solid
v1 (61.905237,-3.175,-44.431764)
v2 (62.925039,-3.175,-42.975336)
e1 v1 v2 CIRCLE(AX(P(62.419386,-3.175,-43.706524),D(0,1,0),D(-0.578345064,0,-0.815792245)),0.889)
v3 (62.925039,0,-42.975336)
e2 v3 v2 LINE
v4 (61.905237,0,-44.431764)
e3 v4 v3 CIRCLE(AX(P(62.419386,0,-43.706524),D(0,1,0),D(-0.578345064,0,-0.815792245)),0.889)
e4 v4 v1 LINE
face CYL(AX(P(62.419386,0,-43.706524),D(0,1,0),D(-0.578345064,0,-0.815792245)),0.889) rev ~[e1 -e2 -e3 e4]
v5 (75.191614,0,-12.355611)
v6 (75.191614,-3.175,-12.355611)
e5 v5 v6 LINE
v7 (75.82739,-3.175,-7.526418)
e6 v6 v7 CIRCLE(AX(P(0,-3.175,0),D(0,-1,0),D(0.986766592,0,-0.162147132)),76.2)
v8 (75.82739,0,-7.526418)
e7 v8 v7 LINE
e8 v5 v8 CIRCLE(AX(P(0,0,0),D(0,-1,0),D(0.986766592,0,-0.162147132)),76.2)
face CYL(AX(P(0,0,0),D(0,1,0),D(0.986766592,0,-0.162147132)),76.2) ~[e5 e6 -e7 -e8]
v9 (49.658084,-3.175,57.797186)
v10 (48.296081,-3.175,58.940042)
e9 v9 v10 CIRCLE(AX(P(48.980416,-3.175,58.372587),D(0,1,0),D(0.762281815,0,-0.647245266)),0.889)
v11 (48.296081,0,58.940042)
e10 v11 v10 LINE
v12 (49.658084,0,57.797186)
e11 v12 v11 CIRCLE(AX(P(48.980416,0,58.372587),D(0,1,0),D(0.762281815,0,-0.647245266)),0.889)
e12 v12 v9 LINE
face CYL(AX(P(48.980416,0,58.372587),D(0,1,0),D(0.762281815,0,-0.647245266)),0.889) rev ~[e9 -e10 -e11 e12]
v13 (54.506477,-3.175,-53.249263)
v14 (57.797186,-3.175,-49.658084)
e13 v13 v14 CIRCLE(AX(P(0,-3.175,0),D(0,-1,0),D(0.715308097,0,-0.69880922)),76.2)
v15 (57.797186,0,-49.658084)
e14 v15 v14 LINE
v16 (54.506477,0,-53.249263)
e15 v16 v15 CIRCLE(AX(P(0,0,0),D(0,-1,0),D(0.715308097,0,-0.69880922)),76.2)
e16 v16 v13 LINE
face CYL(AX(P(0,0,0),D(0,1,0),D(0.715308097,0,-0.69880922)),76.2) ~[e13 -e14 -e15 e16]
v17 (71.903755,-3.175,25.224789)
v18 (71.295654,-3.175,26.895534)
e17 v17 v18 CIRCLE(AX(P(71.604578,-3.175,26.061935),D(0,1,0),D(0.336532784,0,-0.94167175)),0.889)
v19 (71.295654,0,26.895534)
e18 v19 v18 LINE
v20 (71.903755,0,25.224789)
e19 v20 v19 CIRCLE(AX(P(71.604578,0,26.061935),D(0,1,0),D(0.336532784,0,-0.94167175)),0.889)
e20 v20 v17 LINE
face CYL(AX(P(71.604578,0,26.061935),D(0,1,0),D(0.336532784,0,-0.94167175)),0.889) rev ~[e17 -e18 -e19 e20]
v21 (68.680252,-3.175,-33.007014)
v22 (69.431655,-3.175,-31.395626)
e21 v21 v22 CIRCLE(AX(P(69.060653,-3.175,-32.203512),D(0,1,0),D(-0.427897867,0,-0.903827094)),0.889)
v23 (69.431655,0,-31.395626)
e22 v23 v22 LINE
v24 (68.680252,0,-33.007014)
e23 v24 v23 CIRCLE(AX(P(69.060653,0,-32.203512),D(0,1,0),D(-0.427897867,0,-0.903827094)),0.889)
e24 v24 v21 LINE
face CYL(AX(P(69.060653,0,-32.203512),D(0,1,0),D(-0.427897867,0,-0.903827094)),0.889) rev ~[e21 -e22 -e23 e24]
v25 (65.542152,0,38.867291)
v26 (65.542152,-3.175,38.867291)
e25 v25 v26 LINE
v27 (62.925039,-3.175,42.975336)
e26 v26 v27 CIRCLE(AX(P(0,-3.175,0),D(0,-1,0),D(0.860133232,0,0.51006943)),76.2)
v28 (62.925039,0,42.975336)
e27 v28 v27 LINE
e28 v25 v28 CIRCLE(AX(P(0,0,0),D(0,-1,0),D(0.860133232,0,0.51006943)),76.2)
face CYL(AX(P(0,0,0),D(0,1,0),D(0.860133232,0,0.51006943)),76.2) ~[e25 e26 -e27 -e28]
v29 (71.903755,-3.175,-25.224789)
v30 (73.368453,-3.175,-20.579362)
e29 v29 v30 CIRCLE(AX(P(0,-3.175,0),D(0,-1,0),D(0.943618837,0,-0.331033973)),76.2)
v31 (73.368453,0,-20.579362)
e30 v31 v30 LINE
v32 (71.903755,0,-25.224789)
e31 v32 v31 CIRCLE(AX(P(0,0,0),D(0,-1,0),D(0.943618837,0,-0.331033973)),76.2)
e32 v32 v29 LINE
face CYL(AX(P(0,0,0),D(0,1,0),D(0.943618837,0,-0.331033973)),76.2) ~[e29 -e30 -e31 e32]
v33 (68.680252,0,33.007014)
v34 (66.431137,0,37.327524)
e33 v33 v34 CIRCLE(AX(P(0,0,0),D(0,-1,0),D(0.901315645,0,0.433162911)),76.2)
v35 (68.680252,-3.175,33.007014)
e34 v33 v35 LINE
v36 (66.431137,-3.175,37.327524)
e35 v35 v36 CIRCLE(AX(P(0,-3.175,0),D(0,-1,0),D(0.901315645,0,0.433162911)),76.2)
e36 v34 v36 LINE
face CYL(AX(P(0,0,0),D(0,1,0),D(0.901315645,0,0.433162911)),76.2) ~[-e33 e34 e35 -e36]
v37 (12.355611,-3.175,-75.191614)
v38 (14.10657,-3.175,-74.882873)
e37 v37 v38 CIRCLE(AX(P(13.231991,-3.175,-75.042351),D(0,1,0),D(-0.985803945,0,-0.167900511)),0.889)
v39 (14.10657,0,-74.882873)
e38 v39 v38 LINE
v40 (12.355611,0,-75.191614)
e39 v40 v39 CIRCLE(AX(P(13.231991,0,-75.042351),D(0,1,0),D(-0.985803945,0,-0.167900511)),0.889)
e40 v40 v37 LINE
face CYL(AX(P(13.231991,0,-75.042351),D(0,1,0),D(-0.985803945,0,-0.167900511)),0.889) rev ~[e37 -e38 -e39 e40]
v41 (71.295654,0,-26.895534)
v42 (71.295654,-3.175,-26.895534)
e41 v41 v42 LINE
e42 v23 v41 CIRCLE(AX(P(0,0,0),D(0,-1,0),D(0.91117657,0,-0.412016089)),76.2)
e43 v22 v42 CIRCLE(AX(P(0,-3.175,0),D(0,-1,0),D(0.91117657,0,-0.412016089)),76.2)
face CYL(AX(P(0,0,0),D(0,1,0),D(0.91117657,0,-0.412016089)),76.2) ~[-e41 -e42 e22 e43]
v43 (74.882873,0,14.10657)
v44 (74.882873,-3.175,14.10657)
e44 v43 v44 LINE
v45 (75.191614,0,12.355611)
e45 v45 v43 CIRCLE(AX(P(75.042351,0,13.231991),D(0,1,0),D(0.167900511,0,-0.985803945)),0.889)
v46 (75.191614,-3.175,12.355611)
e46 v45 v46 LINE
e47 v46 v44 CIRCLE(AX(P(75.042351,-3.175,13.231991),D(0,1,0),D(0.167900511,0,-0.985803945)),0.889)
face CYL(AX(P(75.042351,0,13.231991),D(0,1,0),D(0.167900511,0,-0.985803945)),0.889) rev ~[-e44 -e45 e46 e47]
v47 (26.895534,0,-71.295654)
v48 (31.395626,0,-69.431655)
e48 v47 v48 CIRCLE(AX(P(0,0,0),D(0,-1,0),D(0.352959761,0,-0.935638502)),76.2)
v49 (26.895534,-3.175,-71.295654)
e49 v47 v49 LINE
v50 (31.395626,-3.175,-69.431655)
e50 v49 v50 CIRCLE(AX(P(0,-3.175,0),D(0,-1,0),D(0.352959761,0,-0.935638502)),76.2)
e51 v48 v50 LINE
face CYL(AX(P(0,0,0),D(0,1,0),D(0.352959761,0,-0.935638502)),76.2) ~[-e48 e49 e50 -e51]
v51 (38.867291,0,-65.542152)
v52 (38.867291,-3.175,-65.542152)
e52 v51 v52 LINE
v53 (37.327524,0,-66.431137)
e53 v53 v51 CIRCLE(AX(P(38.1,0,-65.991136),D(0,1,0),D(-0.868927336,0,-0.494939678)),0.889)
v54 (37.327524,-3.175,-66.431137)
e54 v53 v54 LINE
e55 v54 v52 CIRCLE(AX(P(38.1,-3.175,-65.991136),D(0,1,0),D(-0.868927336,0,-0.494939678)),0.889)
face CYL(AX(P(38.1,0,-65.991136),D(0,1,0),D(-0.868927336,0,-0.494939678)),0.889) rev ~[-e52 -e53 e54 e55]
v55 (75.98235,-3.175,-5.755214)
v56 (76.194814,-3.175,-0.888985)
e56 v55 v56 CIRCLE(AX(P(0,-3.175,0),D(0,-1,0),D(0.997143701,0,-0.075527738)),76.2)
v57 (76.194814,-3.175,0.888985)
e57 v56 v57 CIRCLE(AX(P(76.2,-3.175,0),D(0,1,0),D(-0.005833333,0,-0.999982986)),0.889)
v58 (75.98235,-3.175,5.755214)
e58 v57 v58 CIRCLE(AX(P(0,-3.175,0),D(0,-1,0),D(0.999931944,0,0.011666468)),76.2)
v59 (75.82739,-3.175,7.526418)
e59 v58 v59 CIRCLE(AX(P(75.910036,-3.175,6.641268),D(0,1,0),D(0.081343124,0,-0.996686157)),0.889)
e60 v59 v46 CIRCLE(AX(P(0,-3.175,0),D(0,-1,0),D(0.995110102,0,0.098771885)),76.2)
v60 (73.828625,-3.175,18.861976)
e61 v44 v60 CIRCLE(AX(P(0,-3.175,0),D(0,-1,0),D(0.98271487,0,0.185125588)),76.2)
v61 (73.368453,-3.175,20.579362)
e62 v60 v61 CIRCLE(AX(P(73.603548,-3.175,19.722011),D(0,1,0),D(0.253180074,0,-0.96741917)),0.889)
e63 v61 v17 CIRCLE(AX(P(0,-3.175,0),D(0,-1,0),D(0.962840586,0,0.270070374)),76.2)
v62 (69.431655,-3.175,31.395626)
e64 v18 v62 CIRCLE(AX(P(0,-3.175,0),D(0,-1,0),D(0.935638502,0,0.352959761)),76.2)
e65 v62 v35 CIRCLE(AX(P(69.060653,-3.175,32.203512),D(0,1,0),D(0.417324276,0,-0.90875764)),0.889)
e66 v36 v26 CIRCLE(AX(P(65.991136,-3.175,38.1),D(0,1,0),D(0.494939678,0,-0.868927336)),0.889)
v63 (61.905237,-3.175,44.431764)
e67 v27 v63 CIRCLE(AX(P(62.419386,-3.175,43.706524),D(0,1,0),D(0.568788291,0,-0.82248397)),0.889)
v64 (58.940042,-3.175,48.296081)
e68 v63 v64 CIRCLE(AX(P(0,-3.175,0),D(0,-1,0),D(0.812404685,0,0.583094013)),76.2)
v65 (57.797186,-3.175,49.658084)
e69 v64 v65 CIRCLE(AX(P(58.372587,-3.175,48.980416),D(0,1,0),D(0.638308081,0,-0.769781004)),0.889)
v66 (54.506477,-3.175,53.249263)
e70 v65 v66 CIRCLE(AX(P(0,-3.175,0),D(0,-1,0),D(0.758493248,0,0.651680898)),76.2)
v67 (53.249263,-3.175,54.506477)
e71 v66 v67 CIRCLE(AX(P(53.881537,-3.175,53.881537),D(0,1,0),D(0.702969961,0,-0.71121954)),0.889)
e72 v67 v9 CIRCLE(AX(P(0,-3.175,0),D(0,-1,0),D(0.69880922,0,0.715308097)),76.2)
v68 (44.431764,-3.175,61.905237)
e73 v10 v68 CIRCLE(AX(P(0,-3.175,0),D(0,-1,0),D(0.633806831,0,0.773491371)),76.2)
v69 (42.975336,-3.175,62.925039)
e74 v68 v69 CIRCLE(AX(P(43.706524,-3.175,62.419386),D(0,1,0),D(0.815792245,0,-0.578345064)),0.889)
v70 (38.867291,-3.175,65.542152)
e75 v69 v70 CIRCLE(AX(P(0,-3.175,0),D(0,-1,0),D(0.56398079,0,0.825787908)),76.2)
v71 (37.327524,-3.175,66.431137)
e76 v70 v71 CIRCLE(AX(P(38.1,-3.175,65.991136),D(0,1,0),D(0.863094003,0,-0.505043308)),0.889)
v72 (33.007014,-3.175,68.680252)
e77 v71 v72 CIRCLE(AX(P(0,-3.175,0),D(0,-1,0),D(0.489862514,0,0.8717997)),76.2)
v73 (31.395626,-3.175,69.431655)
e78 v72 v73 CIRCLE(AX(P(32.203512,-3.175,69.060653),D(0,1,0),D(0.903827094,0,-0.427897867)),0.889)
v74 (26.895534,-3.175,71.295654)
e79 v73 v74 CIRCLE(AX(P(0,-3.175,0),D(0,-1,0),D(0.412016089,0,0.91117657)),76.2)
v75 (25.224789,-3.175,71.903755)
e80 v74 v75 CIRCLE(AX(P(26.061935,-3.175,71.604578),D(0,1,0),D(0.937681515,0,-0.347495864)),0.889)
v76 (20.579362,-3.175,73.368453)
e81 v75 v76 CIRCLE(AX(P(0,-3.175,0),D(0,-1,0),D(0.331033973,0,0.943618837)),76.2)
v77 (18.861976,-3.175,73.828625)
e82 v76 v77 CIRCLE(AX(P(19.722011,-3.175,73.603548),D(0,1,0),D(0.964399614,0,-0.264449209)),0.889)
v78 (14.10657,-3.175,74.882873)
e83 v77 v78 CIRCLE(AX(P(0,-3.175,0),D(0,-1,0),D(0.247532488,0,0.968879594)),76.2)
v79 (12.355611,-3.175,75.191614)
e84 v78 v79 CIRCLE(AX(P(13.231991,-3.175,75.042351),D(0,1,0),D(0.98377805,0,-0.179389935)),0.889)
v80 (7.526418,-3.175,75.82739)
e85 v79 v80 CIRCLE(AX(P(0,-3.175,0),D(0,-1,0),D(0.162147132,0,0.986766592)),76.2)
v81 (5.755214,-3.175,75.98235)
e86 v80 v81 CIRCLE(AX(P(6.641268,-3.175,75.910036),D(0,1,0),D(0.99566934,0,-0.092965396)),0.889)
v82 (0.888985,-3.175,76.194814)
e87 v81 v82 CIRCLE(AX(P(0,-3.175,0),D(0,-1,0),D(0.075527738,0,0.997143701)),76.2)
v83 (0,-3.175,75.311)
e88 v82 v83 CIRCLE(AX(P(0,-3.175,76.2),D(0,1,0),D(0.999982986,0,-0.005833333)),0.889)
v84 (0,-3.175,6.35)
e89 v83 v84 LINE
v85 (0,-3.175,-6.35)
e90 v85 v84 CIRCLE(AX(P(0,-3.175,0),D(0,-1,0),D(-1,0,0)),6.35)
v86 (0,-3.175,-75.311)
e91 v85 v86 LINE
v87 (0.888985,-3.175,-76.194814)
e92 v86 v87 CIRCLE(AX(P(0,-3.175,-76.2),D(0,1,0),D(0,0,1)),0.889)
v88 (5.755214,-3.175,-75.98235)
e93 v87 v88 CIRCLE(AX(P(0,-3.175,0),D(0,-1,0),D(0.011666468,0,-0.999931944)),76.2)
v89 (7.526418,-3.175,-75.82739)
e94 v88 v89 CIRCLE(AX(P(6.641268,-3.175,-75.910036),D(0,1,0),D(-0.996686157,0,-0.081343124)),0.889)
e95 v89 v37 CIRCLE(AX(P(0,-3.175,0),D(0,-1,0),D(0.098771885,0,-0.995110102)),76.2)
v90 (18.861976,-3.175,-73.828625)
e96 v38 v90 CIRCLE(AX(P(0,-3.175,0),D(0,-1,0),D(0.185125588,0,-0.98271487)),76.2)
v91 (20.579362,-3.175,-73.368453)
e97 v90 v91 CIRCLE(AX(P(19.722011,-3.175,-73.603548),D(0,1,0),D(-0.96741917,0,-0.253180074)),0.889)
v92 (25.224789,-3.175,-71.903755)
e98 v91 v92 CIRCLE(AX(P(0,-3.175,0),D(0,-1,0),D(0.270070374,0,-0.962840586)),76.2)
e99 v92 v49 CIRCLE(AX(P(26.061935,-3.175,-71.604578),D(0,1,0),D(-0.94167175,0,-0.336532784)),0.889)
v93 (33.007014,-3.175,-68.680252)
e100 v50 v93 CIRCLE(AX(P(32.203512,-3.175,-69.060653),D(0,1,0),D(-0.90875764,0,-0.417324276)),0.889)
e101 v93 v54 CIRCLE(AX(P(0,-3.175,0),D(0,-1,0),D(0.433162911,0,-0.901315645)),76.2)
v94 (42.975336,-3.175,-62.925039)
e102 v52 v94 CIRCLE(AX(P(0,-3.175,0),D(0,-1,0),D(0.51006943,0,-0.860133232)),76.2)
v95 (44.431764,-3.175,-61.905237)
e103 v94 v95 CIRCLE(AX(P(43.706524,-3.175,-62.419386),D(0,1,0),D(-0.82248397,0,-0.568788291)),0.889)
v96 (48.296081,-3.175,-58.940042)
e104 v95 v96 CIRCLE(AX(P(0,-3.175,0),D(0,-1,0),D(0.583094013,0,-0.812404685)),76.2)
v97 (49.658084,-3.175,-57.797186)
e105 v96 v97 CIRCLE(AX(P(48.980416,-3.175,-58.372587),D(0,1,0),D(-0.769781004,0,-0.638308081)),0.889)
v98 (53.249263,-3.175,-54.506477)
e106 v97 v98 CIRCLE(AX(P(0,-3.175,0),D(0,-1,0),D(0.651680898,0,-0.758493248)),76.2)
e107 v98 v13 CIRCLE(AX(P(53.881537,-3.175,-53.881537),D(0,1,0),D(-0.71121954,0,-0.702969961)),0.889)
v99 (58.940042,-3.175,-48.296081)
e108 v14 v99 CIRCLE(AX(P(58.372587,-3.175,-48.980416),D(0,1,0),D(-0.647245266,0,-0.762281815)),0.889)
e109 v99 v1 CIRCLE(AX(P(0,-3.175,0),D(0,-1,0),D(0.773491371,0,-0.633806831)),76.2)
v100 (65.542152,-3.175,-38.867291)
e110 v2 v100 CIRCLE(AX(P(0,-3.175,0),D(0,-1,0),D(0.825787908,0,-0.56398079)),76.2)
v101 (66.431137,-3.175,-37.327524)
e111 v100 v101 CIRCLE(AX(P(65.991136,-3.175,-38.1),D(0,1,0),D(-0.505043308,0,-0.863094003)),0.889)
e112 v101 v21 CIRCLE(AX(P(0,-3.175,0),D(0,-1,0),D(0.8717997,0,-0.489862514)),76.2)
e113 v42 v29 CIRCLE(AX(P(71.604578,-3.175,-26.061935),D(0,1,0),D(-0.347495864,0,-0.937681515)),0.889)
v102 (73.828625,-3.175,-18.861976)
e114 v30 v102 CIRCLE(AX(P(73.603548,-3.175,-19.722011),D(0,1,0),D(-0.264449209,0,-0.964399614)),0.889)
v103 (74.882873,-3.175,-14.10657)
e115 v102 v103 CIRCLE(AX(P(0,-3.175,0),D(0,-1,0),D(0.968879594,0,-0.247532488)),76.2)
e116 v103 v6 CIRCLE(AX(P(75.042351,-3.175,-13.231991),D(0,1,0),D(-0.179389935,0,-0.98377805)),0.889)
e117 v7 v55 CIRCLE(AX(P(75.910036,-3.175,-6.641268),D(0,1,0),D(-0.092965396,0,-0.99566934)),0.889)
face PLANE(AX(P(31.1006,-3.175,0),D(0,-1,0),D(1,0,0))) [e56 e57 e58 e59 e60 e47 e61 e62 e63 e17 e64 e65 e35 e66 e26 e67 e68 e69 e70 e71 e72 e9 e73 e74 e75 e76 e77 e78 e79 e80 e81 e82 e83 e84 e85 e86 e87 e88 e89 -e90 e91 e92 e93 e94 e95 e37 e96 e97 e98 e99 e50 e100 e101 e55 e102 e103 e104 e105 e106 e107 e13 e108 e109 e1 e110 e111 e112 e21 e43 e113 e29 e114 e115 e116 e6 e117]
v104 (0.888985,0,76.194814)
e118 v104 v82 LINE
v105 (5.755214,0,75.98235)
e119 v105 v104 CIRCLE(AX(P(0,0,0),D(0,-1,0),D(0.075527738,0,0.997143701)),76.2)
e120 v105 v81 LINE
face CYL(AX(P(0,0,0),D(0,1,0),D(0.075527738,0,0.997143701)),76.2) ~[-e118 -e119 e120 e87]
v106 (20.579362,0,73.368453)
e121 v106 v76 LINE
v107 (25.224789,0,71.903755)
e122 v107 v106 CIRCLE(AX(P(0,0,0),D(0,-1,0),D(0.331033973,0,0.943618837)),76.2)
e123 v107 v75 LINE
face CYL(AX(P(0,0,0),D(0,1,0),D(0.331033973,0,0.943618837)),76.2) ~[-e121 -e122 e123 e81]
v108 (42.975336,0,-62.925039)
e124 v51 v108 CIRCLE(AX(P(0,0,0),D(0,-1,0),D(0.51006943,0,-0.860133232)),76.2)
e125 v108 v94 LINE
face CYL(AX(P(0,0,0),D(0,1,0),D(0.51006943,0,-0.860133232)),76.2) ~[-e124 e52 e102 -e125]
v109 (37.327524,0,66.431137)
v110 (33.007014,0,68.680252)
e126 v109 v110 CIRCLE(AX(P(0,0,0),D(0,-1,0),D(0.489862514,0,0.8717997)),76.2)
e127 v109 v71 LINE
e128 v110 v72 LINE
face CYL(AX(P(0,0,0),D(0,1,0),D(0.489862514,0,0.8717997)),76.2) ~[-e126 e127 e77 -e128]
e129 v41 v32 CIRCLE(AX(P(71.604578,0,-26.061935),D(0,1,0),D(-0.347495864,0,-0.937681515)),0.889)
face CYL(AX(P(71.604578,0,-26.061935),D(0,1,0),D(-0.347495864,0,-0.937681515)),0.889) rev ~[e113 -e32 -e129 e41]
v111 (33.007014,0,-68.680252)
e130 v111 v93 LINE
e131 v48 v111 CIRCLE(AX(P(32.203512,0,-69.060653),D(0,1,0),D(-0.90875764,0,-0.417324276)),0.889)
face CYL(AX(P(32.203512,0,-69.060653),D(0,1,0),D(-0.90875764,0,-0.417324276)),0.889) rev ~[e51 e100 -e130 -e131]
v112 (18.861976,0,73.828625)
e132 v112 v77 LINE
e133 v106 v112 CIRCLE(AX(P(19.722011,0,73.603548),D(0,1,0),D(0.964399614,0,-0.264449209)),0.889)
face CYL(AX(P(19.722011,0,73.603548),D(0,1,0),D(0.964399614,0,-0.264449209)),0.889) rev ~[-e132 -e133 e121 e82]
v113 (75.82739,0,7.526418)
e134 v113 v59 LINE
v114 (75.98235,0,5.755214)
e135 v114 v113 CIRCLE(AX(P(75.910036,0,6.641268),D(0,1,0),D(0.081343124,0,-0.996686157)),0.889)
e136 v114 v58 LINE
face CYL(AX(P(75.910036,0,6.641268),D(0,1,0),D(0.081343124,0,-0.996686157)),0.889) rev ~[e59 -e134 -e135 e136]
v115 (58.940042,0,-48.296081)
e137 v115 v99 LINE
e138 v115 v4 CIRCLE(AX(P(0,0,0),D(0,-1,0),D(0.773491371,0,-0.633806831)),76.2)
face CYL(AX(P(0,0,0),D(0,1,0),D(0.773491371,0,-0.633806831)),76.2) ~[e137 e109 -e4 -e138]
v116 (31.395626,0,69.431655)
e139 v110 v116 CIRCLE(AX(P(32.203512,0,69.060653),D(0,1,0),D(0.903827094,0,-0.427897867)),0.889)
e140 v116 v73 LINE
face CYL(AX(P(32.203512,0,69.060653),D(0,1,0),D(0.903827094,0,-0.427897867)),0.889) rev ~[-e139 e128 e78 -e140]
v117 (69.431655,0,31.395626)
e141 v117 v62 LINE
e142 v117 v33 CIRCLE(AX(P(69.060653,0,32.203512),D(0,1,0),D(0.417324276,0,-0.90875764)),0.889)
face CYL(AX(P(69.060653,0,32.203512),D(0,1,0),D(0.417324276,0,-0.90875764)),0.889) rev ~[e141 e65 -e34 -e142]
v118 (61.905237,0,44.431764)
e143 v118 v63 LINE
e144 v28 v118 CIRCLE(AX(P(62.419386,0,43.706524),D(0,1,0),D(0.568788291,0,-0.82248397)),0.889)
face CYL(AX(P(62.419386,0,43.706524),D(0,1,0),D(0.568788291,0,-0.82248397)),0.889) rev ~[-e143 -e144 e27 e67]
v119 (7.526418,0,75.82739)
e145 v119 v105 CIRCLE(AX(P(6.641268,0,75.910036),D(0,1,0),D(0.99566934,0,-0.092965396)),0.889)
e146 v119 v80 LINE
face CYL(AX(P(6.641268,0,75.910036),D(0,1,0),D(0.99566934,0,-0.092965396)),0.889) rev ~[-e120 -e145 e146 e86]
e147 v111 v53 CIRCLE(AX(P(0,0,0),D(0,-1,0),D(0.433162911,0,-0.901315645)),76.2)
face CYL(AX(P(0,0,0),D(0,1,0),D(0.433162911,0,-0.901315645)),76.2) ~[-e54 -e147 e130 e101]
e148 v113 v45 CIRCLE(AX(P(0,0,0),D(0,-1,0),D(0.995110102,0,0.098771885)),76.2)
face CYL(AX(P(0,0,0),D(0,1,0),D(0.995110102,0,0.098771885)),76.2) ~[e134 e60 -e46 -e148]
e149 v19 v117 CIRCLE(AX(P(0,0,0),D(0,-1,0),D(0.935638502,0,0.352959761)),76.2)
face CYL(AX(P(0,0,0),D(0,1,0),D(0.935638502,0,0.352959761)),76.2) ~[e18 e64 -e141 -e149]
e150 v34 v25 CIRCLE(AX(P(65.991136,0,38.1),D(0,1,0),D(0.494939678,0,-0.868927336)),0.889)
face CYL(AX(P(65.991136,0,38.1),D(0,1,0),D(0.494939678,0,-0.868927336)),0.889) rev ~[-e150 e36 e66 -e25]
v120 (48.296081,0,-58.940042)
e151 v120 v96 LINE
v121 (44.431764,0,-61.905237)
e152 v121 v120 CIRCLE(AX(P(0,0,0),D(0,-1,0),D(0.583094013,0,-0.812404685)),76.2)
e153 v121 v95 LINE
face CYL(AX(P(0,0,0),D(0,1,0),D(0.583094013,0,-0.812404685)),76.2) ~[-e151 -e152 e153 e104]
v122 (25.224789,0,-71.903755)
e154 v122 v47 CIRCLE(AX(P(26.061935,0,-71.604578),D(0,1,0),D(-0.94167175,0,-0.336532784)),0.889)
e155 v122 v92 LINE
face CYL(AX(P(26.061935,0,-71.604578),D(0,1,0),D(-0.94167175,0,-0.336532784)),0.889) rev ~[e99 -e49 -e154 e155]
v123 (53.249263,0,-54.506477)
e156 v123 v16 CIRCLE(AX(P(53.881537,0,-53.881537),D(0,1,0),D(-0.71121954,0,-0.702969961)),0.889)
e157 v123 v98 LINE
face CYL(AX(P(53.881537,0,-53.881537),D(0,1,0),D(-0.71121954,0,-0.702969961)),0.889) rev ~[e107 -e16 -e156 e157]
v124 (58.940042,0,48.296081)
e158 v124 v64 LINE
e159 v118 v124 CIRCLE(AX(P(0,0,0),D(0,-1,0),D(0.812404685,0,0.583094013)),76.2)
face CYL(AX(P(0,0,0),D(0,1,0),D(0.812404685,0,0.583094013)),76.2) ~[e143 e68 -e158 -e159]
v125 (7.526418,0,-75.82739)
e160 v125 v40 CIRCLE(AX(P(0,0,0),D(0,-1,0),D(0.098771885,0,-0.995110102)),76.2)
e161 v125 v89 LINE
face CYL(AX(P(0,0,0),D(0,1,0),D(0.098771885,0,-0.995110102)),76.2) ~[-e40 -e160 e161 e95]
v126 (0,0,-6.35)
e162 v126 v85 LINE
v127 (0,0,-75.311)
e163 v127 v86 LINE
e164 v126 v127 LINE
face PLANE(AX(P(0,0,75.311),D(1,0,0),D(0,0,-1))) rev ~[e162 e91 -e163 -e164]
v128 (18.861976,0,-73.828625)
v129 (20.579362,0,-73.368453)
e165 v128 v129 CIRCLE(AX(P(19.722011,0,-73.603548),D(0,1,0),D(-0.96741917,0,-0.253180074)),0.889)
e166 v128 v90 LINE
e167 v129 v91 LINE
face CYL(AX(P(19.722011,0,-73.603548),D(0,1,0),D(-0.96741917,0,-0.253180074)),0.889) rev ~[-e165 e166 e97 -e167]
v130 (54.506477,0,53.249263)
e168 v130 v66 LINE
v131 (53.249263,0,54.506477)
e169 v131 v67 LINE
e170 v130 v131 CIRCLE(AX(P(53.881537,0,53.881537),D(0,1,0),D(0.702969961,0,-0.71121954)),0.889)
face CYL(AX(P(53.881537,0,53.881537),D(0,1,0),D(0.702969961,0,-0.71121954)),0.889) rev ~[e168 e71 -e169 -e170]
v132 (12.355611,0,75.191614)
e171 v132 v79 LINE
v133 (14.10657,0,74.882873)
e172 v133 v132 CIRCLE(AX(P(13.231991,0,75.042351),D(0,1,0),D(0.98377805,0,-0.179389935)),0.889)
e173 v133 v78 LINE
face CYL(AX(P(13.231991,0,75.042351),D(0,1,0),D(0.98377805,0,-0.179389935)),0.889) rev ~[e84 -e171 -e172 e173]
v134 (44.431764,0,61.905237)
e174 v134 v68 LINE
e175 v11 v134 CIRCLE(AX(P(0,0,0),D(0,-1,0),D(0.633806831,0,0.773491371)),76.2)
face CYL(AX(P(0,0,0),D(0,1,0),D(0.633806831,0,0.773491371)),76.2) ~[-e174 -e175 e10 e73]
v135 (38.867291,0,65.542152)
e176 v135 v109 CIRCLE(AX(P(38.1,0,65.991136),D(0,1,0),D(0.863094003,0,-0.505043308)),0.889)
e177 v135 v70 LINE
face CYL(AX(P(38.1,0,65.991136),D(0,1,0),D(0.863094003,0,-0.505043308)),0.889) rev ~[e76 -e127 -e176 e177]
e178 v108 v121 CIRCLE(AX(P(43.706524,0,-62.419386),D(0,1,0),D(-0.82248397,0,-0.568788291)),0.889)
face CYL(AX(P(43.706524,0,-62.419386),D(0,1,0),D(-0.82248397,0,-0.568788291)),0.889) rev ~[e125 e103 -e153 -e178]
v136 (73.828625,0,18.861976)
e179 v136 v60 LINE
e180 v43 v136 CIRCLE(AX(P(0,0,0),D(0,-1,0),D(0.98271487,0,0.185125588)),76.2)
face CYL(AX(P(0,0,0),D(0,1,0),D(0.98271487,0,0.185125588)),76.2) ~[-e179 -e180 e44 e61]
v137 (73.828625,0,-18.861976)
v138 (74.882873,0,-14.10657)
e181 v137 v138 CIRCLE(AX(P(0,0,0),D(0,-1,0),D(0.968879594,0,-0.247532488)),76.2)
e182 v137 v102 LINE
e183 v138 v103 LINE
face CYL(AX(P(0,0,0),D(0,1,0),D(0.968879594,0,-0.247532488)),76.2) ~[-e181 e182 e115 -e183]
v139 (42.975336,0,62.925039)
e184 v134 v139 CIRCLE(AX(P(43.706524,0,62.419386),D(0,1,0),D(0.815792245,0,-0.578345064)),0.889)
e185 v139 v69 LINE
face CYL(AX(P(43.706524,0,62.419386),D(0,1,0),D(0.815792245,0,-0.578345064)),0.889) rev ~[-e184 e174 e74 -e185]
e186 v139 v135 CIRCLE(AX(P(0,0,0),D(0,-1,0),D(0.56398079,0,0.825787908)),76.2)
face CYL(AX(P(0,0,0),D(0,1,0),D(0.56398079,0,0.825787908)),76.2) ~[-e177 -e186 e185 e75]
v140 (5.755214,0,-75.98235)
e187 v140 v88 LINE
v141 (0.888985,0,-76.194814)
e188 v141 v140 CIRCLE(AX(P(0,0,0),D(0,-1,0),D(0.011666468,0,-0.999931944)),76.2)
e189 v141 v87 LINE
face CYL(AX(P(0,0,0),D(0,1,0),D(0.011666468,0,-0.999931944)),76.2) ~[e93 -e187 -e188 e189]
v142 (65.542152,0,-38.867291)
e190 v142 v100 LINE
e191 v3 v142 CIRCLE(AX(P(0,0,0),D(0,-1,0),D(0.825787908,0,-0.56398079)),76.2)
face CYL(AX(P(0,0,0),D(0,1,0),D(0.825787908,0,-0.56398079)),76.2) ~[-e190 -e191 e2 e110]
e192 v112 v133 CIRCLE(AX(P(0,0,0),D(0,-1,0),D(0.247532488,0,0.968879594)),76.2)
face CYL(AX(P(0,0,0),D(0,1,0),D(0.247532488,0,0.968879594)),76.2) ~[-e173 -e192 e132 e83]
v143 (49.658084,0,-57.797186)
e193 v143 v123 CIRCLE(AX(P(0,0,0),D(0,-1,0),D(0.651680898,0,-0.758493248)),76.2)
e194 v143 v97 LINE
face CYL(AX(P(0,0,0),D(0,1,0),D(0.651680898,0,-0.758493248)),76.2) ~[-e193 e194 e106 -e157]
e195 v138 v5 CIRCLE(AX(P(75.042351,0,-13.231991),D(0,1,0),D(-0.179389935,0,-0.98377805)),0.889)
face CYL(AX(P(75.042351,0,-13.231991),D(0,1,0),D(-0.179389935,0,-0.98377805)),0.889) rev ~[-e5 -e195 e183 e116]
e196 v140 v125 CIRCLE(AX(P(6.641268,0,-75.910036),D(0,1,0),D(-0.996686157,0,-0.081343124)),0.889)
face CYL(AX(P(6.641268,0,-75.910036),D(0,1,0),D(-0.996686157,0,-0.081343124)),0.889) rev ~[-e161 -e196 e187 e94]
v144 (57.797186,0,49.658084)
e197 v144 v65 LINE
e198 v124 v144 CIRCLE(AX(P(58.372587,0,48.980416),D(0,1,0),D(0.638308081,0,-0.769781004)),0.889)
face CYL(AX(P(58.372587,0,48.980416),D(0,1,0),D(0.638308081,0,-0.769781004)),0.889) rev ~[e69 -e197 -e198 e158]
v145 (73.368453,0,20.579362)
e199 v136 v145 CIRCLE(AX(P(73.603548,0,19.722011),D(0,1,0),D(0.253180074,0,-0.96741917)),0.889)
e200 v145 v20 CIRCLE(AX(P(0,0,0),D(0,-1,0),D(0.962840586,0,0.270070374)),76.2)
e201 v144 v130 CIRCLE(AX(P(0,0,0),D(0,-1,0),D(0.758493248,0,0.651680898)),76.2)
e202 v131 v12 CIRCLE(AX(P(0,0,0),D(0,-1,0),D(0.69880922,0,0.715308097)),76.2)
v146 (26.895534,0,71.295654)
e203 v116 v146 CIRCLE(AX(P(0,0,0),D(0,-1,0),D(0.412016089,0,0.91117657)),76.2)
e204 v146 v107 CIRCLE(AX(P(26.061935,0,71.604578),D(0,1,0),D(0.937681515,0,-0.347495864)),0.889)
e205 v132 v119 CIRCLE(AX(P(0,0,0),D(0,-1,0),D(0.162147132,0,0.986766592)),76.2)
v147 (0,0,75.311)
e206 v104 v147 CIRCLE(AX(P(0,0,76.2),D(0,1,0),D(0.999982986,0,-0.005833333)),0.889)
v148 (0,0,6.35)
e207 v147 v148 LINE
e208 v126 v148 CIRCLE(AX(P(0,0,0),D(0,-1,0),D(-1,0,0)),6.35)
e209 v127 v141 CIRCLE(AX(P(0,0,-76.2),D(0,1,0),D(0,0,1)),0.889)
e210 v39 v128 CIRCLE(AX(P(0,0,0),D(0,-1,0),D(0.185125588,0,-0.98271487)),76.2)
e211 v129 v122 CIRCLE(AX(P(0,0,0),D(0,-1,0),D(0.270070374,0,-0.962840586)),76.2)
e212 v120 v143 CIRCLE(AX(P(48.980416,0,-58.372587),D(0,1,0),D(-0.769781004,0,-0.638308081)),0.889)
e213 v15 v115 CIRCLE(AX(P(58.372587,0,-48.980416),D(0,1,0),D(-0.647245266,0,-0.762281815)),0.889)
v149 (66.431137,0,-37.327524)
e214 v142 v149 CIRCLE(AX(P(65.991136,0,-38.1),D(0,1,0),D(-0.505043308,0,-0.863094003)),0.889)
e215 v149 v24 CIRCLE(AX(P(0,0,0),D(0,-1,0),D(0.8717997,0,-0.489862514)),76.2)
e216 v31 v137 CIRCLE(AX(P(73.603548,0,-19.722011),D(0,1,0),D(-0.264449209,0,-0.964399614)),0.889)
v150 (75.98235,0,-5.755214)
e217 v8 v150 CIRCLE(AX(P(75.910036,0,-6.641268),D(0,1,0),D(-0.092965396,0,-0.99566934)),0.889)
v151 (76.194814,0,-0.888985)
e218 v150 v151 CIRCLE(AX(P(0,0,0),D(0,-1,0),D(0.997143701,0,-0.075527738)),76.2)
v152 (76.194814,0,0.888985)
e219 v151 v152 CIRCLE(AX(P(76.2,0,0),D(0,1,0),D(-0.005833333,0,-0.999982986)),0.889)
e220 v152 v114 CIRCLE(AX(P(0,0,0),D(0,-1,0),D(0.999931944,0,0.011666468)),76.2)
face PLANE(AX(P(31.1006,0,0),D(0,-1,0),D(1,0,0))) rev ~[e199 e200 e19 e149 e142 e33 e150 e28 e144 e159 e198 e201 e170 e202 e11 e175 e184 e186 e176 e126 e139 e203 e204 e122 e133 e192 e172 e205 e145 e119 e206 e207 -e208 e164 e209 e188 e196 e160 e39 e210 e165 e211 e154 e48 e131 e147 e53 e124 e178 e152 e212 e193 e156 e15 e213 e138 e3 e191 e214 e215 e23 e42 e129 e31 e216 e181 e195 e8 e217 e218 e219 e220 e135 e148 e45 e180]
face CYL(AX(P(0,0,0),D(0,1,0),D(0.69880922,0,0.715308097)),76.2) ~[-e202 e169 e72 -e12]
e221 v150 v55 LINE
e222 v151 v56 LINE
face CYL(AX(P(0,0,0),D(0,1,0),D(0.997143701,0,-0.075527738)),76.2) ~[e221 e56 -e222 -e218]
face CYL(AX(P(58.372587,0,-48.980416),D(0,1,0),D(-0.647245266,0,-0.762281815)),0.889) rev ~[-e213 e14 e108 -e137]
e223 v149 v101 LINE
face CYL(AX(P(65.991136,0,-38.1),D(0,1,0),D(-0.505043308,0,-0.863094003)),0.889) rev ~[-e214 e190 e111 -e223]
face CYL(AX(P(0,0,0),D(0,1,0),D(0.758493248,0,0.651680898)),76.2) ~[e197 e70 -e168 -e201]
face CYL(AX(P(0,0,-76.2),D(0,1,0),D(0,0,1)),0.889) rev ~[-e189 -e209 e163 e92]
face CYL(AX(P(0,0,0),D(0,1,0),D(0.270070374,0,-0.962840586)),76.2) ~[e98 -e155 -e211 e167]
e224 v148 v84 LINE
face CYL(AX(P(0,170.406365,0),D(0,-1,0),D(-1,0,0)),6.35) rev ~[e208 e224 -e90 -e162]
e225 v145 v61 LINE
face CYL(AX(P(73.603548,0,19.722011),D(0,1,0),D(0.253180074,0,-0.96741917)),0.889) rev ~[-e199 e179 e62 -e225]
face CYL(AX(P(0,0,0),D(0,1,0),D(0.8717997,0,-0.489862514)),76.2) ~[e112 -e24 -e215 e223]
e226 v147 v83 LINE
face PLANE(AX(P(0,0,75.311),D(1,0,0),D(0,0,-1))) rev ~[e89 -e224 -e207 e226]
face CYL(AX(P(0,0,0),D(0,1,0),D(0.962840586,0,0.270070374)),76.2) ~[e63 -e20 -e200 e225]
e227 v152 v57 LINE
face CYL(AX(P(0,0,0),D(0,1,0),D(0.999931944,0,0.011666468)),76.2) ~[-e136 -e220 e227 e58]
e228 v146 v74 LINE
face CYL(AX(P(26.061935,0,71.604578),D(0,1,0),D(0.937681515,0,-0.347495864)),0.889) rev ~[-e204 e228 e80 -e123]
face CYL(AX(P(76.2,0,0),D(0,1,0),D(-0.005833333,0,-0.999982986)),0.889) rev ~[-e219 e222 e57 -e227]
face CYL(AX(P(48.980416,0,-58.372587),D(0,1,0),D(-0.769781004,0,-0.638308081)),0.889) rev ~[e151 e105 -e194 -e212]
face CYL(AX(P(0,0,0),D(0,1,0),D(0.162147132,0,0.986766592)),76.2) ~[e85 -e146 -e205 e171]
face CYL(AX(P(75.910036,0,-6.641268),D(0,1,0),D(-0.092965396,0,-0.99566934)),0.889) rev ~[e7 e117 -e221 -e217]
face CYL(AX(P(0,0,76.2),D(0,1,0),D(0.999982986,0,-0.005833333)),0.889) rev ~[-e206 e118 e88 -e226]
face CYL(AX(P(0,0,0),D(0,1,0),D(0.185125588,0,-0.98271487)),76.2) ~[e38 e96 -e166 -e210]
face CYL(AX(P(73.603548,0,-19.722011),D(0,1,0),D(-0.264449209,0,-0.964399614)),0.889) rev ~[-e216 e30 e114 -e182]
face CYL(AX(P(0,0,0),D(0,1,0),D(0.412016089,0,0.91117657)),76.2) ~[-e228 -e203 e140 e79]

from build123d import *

# Parameters (mm, degrees)
F2_DEPTH = 3.175
F3_D     = 12.7


with BuildPart() as f2:
    # F0 (on Front) → F2 (new body)
    with BuildSketch(Plane.XZ):
        with BuildLine():
            ThreePointArc((5.7552136035, 75.9823500319), (3.3237973172, 76.1274744845), (0.8889848745, 76.1948141667))
            ThreePointArc((0.8889848745, 76.1948141667), (0.6267817779, 75.5695512686), (0, 75.311))
            Line((0, 75.311), (0, -75.311))
            ThreePointArc((0, -75.311), (0.6267817779, -75.5695512686), (0.8889848745, -76.1948141667))
            ThreePointArc((0.8889848745, -76.1948141667), (3.3237973172, -76.1274744845), (5.7552136035, -75.9823500319))
            ThreePointArc((5.7552136035, -75.9823500319), (6.5637861421, -75.024418908), (7.5264176409, -75.8273897579))
            ThreePointArc((7.5264176409, -75.8273897579), (9.9460958472, -75.5480984367), (12.355611431, -75.1916143341))
            ThreePointArc((12.355611431, -75.1916143341), (13.0776179083, -74.1668566871), (14.1065698245, -74.8828731272))
            ThreePointArc((14.1065698245, -74.8828731272), (16.4926985821, -74.3937557425), (18.8619755949, -73.8286250492))
            ThreePointArc((18.8619755949, -73.8286250492), (19.4919211057, -72.7448399037), (20.5793624939, -73.3684526165))
            ThreePointArc((20.5793624939, -73.3684526165), (22.9137819222, -72.673231647), (25.2247887354, -71.9037553488))
            ThreePointArc((25.2247887354, -71.9037553488), (25.757879014, -70.769190964), (26.8955337885, -71.2956538804))
            ThreePointArc((26.8955337885, -71.2956538804), (29.1604775462, -70.3996203774), (31.3956260024, -69.4316546534))
            ThreePointArc((31.3956260024, -69.4316546534), (31.82780391, -68.2549457495), (33.0070138311, -68.6802521687))
            ThreePointArc((33.0070138311, -68.6802521687), (35.1852443285, -67.5902254882), (37.3275235984, -66.4311371422))
            ThreePointArc((37.3275235984, -66.4311371422), (37.6555, -65.2212391844), (38.8672905683, -65.5421522677))
            ThreePointArc((38.8672905683, -65.5421522677), (40.942230156, -64.2664281709), (42.9753362008, -62.9250385651))
            ThreePointArc((42.9753362008, -62.9250385651), (43.196614998, -61.6911596074), (44.4317637555, -61.9052370125))
            ThreePointArc((44.4317637555, -61.9052370125), (46.3876208905, -60.4535245302), (48.2960805456, -58.9400424494))
            ThreePointArc((48.2960805456, -58.9400424494), (48.4089776731, -57.6915730557), (49.6580843918, -57.7971855243))
            ThreePointArc((49.6580843918, -57.7971855243), (51.4799738203, -56.1805330649), (53.2492625554, -54.5064770216))
            ThreePointArc((53.2492625554, -54.5064770216), (53.2529187979, -53.2529187979), (54.5064770216, -53.2492625554))
            ThreePointArc((54.5064770216, -53.2492625554), (56.1805330649, -51.4799738203), (57.7971855243, -49.6580843918))
            ThreePointArc((57.7971855243, -49.6580843918), (57.6915730557, -48.4089776731), (58.9400424494, -48.2960805456))
            ThreePointArc((58.9400424494, -48.2960805456), (60.4535245302, -46.3876208905), (61.9052370125, -44.4317637555))
            ThreePointArc((61.9052370125, -44.4317637555), (61.6911596074, -43.196614998), (62.9250385651, -42.9753362008))
            ThreePointArc((62.9250385651, -42.9753362008), (64.2664281709, -40.942230156), (65.5421522677, -38.8672905683))
            ThreePointArc((65.5421522677, -38.8672905683), (65.2212391844, -37.6555), (66.4311371422, -37.3275235984))
            ThreePointArc((66.4311371422, -37.3275235984), (67.5902254882, -35.1852443285), (68.6802521687, -33.0070138311))
            ThreePointArc((68.6802521687, -33.0070138311), (68.2549457495, -31.82780391), (69.4316546534, -31.3956260024))
            ThreePointArc((69.4316546534, -31.3956260024), (70.3996203774, -29.1604775462), (71.2956538804, -26.8955337885))
            ThreePointArc((71.2956538804, -26.8955337885), (70.769190964, -25.757879014), (71.9037553488, -25.2247887354))
            ThreePointArc((71.9037553488, -25.2247887354), (72.673231647, -22.9137819222), (73.3684526165, -20.5793624939))
            ThreePointArc((73.3684526165, -20.5793624939), (72.7448399037, -19.4919211057), (73.8286250492, -18.8619755949))
            ThreePointArc((73.8286250492, -18.8619755949), (74.3937557425, -16.4926985821), (74.8828731272, -14.1065698245))
            ThreePointArc((74.8828731272, -14.1065698245), (74.1668566871, -13.0776179083), (75.1916143341, -12.355611431))
            ThreePointArc((75.1916143341, -12.355611431), (75.5480984367, -9.9460958472), (75.8273897579, -7.5264176409))
            ThreePointArc((75.8273897579, -7.5264176409), (75.024418908, -6.5637861421), (75.9823500319, -5.7552136035))
            ThreePointArc((75.9823500319, -5.7552136035), (76.1274744845, -3.3237973172), (76.1948141667, -0.8889848745))
            ThreePointArc((76.1948141667, -0.8889848745), (75.311, 0), (76.1948141667, 0.8889848745))
            ThreePointArc((76.1948141667, 0.8889848745), (76.1274744845, 3.3237973172), (75.9823500319, 5.7552136035))
            ThreePointArc((75.9823500319, 5.7552136035), (75.024418908, 6.5637861421), (75.8273897579, 7.5264176409))
            ThreePointArc((75.8273897579, 7.5264176409), (75.5480984367, 9.9460958472), (75.1916143341, 12.355611431))
            ThreePointArc((75.1916143341, 12.355611431), (74.1668566871, 13.0776179083), (74.8828731272, 14.1065698245))
            ThreePointArc((74.8828731272, 14.1065698245), (74.3937557425, 16.4926985821), (73.8286250492, 18.8619755949))
            ThreePointArc((73.8286250492, 18.8619755949), (72.7448399037, 19.4919211057), (73.3684526165, 20.5793624939))
            ThreePointArc((73.3684526165, 20.5793624939), (72.673231647, 22.9137819222), (71.9037553488, 25.2247887354))
            ThreePointArc((71.9037553488, 25.2247887354), (70.769190964, 25.757879014), (71.2956538804, 26.8955337885))
            ThreePointArc((71.2956538804, 26.8955337885), (70.3996203774, 29.1604775462), (69.4316546534, 31.3956260024))
            ThreePointArc((69.4316546534, 31.3956260024), (68.2549457495, 31.82780391), (68.6802521687, 33.0070138311))
            ThreePointArc((68.6802521687, 33.0070138311), (67.5902254882, 35.1852443285), (66.4311371422, 37.3275235984))
            ThreePointArc((66.4311371422, 37.3275235984), (65.2212391844, 37.6555), (65.5421522677, 38.8672905683))
            ThreePointArc((65.5421522677, 38.8672905683), (64.2664281709, 40.942230156), (62.9250385651, 42.9753362008))
            ThreePointArc((62.9250385651, 42.9753362008), (61.6911596074, 43.196614998), (61.9052370125, 44.4317637555))
            ThreePointArc((61.9052370125, 44.4317637555), (60.4535245302, 46.3876208905), (58.9400424494, 48.2960805456))
            ThreePointArc((58.9400424494, 48.2960805456), (57.6915730557, 48.4089776731), (57.7971855243, 49.6580843918))
            ThreePointArc((57.7971855243, 49.6580843918), (56.1805330649, 51.4799738203), (54.5064770216, 53.2492625554))
            ThreePointArc((54.5064770216, 53.2492625554), (53.2529187979, 53.2529187979), (53.2492625554, 54.5064770216))
            ThreePointArc((53.2492625554, 54.5064770216), (51.4799738203, 56.1805330649), (49.6580843918, 57.7971855243))
            ThreePointArc((49.6580843918, 57.7971855243), (48.4089776731, 57.6915730557), (48.2960805456, 58.9400424494))
            ThreePointArc((48.2960805456, 58.9400424494), (46.3876208905, 60.4535245302), (44.4317637555, 61.9052370125))
            ThreePointArc((44.4317637555, 61.9052370125), (43.196614998, 61.6911596074), (42.9753362008, 62.9250385651))
            ThreePointArc((42.9753362008, 62.9250385651), (40.942230156, 64.2664281709), (38.8672905683, 65.5421522677))
            ThreePointArc((38.8672905683, 65.5421522677), (37.6555, 65.2212391844), (37.3275235984, 66.4311371422))
            ThreePointArc((37.3275235984, 66.4311371422), (35.1852443285, 67.5902254882), (33.0070138311, 68.6802521687))
            ThreePointArc((33.0070138311, 68.6802521687), (31.82780391, 68.2549457495), (31.3956260024, 69.4316546534))
            ThreePointArc((31.3956260024, 69.4316546534), (29.1604775462, 70.3996203774), (26.8955337885, 71.2956538804))
            ThreePointArc((26.8955337885, 71.2956538804), (25.757879014, 70.769190964), (25.2247887354, 71.9037553488))
            ThreePointArc((25.2247887354, 71.9037553488), (22.9137819222, 72.673231647), (20.5793624939, 73.3684526165))
            ThreePointArc((20.5793624939, 73.3684526165), (19.4919211057, 72.7448399037), (18.8619755949, 73.8286250492))
            ThreePointArc((18.8619755949, 73.8286250492), (16.4926985821, 74.3937557425), (14.1065698245, 74.8828731272))
            ThreePointArc((14.1065698245, 74.8828731272), (13.0776179083, 74.1668566871), (12.355611431, 75.1916143341))
            ThreePointArc((12.355611431, 75.1916143341), (9.9460958472, 75.5480984367), (7.5264176409, 75.8273897579))
            ThreePointArc((7.5264176409, 75.8273897579), (6.5637861421, 75.024418908), (5.7552136035, 75.9823500319))
        make_face()
    extrude(amount=F2_DEPTH)

    # F3 (through all)
    with Locations(Plane(origin=(0, 0, 0), x_dir=(1, 0, 0), z_dir=(0, 1, 0))):
        with Locations((0, 0)):
            Hole(F3_D / 2)


solid = f2.part
